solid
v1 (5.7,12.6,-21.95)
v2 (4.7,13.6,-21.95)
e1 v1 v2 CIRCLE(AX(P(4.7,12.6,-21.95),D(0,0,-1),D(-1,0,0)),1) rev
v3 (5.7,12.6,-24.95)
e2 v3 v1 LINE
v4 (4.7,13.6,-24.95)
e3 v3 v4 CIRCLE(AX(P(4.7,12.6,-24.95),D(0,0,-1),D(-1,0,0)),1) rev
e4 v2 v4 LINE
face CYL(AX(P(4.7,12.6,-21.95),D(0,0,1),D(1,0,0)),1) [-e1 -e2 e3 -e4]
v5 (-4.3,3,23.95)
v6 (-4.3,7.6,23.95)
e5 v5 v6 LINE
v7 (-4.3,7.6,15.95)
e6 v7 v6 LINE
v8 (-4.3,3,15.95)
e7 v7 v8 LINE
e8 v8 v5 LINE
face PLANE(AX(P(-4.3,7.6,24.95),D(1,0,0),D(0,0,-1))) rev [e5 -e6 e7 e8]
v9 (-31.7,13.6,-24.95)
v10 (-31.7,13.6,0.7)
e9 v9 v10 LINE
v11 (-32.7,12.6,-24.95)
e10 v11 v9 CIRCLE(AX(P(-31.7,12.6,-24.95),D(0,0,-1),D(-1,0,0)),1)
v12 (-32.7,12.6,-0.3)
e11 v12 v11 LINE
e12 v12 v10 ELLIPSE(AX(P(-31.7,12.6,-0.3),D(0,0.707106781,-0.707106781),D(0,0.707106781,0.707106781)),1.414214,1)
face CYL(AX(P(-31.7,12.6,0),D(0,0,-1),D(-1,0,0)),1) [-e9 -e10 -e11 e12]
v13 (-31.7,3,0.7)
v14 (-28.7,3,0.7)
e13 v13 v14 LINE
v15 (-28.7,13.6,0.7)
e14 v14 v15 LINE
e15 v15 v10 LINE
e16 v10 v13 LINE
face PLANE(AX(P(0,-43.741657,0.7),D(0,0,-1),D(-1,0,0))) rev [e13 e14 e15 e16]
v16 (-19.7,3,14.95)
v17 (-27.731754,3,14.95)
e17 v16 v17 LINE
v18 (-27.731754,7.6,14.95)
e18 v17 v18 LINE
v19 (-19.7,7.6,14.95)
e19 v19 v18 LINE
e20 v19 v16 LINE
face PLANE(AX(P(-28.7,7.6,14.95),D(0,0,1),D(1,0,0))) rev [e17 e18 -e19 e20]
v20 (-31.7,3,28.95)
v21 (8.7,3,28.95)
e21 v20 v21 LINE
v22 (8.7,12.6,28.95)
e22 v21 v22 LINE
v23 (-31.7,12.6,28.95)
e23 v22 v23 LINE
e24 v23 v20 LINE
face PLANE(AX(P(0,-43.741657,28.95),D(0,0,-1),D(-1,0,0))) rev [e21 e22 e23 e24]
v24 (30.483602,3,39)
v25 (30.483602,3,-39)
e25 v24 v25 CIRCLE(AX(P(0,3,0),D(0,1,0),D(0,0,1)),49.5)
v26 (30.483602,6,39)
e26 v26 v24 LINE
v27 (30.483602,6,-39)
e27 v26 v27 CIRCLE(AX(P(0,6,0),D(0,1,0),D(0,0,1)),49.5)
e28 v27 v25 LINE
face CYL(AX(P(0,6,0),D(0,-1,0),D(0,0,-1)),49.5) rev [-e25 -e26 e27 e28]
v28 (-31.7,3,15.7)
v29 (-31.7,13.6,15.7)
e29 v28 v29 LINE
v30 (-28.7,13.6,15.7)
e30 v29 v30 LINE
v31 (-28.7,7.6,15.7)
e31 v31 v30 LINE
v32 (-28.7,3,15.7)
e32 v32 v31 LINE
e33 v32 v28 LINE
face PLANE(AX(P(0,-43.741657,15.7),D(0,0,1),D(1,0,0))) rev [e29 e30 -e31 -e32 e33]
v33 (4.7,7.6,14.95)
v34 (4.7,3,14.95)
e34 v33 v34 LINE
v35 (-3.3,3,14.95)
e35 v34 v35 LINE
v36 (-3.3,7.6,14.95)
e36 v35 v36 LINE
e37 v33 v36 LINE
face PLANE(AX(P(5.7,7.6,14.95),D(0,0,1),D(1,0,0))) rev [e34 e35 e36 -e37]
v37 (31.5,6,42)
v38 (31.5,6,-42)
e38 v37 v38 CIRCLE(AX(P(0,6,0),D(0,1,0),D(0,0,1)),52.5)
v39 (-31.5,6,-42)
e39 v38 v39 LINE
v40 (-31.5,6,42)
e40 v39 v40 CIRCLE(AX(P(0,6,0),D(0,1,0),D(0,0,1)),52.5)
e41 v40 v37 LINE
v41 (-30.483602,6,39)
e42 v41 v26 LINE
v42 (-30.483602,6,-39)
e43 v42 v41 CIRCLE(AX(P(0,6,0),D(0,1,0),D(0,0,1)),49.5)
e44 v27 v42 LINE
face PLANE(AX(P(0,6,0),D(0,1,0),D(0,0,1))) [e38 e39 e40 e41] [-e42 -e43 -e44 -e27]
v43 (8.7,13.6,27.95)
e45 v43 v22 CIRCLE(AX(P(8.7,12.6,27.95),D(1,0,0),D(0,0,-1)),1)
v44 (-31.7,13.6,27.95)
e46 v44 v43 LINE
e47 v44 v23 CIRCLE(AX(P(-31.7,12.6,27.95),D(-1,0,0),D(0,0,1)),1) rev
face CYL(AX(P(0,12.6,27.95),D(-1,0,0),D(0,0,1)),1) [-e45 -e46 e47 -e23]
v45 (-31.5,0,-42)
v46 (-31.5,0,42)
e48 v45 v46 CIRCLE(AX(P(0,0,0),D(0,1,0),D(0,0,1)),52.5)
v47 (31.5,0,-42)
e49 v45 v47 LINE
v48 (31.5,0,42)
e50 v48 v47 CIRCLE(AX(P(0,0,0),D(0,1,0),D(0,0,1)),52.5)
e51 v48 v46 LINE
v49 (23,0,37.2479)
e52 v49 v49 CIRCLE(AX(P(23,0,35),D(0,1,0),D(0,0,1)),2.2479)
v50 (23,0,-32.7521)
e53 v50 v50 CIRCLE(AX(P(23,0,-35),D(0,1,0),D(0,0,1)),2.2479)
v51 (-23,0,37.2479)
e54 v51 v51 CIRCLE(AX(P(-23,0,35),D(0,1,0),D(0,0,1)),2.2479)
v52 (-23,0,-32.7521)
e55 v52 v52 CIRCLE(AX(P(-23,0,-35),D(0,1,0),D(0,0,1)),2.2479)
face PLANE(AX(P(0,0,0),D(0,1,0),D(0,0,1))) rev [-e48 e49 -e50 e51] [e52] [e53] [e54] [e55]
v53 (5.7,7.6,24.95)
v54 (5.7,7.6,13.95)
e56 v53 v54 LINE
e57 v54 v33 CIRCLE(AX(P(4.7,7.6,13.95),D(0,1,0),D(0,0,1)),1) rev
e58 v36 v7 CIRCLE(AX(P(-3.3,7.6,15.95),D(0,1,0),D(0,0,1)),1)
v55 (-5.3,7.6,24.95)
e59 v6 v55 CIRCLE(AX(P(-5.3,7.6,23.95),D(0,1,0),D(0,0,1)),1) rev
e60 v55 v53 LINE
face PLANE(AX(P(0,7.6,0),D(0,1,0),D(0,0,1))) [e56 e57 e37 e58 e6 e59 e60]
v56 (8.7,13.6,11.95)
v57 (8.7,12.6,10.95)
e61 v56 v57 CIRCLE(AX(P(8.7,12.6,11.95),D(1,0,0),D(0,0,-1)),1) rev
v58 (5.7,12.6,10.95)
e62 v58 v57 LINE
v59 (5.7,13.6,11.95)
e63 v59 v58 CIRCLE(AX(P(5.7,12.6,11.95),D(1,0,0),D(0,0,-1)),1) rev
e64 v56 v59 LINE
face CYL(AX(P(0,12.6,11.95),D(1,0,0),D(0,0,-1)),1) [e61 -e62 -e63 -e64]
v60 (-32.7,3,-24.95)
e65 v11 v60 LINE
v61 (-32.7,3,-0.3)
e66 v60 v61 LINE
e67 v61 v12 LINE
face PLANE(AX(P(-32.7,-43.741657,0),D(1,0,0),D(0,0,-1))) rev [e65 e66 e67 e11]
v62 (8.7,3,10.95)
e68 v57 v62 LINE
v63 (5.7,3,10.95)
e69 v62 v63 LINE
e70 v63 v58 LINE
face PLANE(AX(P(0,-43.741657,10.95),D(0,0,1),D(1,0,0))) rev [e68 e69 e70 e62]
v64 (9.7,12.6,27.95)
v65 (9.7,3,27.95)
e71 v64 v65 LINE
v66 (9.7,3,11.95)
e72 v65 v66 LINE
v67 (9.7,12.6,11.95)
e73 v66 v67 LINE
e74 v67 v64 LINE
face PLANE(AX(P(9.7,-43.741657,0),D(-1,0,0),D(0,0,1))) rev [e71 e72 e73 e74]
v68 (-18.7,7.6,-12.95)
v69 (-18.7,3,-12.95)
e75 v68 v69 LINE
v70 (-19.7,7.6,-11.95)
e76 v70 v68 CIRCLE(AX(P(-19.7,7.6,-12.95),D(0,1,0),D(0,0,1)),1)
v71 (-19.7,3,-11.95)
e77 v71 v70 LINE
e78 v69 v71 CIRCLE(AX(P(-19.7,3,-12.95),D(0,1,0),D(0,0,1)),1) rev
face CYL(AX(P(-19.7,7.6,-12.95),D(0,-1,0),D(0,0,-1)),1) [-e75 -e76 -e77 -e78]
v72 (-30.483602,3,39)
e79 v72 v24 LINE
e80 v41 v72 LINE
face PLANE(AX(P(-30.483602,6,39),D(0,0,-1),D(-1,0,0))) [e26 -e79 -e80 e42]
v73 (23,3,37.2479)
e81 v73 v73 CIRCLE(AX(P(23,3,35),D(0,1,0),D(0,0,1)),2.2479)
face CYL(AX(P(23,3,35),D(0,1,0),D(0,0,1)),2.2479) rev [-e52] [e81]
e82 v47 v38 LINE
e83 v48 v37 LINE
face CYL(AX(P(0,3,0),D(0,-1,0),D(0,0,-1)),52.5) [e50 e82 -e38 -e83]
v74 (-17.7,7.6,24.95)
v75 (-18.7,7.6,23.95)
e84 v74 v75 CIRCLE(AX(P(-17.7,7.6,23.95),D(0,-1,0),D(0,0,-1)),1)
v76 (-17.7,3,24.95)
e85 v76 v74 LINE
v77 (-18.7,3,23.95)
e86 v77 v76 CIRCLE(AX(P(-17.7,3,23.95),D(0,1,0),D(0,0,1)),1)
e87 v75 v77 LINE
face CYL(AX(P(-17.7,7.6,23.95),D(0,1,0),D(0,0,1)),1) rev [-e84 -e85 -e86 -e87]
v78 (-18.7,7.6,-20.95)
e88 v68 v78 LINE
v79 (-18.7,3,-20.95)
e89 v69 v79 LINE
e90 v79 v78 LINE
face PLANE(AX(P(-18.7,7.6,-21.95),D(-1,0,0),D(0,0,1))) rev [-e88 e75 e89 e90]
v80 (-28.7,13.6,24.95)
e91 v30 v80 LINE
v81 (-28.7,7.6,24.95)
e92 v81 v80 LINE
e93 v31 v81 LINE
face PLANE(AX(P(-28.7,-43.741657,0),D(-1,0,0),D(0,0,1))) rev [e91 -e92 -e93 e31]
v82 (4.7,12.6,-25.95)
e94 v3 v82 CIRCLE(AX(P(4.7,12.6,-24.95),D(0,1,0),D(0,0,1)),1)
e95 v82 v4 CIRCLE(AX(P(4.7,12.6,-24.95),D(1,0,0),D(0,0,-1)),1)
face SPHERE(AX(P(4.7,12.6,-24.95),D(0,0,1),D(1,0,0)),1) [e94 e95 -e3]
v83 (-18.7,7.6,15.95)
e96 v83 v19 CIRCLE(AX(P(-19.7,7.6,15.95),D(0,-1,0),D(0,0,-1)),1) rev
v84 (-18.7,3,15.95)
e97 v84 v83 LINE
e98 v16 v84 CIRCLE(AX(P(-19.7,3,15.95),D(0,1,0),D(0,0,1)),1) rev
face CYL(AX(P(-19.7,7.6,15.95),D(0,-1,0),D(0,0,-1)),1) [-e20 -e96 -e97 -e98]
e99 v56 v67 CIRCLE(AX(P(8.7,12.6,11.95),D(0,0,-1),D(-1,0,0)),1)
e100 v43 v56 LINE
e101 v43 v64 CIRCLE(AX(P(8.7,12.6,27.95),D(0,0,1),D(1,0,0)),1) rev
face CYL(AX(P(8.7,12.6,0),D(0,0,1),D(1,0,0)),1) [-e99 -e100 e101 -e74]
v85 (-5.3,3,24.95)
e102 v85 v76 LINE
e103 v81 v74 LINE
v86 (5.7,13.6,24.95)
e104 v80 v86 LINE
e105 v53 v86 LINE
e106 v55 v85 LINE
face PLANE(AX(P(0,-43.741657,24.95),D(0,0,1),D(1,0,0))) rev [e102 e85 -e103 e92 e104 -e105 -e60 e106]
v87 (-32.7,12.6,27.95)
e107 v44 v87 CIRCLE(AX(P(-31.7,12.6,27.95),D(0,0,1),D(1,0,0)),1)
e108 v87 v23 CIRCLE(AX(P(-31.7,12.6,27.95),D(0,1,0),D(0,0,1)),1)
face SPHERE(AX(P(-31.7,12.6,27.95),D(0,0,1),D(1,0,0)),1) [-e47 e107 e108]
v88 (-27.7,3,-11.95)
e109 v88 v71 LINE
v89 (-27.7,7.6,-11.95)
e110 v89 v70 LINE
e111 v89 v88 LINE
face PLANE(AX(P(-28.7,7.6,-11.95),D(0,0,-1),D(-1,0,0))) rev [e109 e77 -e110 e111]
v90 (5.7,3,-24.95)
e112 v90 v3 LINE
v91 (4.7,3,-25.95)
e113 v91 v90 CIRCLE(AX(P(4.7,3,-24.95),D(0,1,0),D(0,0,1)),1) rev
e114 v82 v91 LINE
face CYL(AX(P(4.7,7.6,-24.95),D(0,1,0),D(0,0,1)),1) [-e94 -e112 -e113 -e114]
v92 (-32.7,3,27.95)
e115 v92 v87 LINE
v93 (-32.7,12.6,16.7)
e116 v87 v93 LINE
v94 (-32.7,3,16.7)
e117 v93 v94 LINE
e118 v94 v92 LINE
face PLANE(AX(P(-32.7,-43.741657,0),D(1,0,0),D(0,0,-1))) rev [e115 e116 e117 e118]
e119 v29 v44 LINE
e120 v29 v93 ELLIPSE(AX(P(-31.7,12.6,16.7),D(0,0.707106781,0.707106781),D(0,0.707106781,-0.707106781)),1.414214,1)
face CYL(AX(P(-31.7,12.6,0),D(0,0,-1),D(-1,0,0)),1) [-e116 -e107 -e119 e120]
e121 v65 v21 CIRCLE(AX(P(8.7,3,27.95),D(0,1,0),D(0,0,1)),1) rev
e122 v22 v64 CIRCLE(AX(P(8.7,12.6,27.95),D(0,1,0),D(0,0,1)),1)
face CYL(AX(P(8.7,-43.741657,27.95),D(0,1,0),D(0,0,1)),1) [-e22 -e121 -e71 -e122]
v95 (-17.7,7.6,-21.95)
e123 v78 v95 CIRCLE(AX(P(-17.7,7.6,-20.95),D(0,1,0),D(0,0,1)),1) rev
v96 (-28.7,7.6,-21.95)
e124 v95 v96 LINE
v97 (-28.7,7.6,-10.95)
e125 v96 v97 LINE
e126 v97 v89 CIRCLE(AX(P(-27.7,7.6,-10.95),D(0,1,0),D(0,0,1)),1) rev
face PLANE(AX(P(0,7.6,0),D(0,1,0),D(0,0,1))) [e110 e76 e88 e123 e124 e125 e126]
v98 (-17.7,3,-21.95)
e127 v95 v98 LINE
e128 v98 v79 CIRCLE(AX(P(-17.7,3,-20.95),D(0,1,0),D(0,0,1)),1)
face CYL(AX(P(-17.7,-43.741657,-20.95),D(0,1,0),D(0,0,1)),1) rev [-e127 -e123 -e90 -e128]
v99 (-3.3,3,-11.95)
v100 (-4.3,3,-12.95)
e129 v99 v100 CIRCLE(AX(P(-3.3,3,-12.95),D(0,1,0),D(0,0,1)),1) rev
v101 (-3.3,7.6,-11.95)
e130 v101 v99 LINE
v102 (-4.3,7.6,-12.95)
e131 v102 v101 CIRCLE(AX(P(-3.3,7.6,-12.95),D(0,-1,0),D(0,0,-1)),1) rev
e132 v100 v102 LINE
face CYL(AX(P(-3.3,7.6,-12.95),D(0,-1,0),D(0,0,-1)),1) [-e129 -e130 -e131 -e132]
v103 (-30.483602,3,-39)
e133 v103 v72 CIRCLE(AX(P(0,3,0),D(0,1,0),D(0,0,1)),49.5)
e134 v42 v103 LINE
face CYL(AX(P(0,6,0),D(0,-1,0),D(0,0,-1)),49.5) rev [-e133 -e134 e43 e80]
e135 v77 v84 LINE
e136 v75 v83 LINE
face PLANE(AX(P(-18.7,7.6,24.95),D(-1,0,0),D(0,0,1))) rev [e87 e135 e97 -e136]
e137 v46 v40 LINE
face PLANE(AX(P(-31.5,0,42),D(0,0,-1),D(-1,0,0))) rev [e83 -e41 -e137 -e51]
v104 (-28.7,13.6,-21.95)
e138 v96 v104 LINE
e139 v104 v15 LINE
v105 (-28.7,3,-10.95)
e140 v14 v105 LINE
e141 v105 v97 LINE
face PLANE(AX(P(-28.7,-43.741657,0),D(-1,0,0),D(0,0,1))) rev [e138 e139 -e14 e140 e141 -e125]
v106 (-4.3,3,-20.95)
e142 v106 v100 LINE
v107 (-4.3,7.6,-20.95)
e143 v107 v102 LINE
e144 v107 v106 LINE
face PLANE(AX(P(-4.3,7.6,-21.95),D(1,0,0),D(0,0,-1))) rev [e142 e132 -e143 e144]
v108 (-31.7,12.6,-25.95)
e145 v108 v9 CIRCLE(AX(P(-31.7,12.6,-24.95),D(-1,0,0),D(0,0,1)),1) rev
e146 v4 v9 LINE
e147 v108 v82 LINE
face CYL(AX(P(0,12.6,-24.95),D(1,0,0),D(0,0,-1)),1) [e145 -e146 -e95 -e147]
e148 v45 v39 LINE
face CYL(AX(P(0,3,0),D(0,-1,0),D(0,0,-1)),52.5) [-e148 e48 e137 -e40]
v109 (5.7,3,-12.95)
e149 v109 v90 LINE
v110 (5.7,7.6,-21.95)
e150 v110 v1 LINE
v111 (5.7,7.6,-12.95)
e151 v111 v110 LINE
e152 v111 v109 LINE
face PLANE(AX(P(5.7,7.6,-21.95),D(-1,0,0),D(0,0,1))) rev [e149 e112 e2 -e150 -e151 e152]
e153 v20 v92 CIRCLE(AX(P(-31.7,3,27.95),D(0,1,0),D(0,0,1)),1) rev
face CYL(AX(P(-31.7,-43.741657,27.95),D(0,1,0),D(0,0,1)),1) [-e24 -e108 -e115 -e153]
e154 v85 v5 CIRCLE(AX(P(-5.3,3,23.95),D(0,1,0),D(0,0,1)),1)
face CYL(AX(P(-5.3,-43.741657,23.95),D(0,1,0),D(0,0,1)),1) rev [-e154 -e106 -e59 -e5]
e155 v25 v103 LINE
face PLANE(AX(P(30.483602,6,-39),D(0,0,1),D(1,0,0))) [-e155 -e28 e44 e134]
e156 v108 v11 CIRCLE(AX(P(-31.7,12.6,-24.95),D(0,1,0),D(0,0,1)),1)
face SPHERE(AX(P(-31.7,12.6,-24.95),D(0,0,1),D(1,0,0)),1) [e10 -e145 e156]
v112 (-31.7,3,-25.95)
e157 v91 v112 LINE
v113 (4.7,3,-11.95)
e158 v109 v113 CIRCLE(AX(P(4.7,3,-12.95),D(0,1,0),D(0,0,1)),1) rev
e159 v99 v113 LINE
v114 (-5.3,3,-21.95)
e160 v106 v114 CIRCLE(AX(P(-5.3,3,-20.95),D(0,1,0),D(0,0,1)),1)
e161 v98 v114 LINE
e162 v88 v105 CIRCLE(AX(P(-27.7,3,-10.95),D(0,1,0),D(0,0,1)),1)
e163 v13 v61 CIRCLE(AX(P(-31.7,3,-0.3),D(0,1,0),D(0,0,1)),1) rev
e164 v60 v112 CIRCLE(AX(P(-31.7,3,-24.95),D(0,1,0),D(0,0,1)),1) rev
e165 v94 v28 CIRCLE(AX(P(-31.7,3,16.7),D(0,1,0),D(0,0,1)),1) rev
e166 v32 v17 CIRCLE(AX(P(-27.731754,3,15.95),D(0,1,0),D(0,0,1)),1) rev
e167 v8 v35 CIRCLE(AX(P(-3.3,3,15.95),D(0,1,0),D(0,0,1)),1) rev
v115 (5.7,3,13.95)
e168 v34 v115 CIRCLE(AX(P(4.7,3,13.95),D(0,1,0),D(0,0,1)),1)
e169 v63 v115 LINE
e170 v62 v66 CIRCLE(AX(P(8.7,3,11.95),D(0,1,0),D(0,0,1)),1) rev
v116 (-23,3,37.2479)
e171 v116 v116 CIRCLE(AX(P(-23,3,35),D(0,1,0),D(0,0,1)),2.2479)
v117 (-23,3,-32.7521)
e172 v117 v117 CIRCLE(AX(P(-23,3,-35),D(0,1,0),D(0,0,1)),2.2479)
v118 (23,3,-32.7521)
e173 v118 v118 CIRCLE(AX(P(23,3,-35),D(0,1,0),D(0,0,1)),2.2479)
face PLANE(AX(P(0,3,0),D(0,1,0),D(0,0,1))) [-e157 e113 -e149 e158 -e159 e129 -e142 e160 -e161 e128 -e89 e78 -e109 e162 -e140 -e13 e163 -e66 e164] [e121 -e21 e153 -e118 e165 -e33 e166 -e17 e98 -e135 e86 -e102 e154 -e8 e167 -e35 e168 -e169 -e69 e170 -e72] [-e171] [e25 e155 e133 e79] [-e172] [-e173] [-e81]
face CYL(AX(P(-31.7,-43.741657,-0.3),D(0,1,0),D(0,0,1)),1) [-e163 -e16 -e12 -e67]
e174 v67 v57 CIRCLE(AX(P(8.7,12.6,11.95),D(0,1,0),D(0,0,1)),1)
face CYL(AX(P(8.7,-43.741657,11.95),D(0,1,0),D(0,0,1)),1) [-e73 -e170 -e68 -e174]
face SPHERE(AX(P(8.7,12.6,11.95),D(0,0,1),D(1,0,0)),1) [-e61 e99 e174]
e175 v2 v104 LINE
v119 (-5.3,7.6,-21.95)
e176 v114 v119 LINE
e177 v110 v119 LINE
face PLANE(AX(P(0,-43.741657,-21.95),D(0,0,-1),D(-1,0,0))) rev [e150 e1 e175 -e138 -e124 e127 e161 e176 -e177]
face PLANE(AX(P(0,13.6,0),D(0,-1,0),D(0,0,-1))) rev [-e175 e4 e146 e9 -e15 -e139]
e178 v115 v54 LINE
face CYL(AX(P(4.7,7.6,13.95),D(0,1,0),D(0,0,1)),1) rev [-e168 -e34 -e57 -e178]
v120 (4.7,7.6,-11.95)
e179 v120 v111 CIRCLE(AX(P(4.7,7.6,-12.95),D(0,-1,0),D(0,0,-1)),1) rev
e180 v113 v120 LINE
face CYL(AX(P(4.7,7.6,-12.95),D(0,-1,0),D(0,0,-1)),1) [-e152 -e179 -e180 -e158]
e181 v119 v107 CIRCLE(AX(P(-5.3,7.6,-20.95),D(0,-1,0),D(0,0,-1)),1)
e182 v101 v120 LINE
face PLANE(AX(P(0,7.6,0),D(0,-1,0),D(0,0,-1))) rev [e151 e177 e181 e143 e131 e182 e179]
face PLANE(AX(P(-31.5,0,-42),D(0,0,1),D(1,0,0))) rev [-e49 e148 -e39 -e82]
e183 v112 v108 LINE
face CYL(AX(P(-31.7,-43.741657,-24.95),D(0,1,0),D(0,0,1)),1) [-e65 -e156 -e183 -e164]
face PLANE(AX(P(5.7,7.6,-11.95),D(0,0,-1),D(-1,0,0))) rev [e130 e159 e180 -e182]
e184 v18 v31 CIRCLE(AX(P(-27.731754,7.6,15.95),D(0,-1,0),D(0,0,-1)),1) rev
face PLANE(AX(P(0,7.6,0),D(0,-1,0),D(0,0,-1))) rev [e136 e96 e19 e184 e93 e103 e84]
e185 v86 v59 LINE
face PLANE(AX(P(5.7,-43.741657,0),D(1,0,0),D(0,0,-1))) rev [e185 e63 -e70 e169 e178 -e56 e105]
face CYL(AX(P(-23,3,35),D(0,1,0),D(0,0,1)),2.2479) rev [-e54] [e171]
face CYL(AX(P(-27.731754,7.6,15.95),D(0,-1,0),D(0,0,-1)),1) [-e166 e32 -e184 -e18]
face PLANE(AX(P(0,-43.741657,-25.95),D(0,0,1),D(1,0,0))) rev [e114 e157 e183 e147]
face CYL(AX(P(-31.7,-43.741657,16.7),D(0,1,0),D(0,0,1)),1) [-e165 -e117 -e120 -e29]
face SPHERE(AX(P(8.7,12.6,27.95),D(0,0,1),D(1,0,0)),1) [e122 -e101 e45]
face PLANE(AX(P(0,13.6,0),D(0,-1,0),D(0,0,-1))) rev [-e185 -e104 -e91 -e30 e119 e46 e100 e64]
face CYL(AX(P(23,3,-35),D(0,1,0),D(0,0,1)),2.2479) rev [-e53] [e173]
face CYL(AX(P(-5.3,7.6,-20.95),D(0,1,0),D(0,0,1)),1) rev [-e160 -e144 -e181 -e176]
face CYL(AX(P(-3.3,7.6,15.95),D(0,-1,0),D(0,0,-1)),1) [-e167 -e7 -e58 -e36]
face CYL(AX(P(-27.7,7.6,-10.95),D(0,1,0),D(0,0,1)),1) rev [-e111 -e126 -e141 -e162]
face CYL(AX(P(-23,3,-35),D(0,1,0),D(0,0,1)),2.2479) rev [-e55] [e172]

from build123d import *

# Parameters (mm, degrees)
A_BASE_T42_OUTLINE_R       = 2.2479
A_BASE_T42_OUTLINE_R_2     = 1
A_BASE_T42_DEPTH           = 3
OUTER_BRIM_DEPTH           = 3
SKETCH5_W                  = 3
SKETCH5_H                  = 15
SKETCH5_W_2                = 15
SKETCH5_H_2                = 3
BASE_SUPPORTS_DEPTH        = 3
BASE_SUPPORTS_CHAMFER_SIZE = 3
COVER_START                = -3
SKETCH6_R                  = 1
COVER_DEPTH                = 3
SKETCH9_W                  = 15
SKETCH9_H                  = 6
SKETCH9_W_2                = 6
SKETCH9_H_2                = 15
CUT_EXTRUDE1_DEPTH         = 10
SKETCH10_W                 = 10
SKETCH10_H                 = 10
BOSS_EXTRUDE1_DEPTH        = 4.6
BOSS_EXTRUDE2_DEPTH        = 10.6
FILLET1_R                  = 1


with BuildPart() as part:
    # a_base_t42: read off the stored shape, not the designer's step
    # a_base_t42 outline → a_base_t42 (new body)
    with BuildSketch(Plane(origin=(0, 0, 0), x_dir=(1, 0, 0), z_dir=(0, 1, 0))):
        with BuildLine():
            ThreePointArc((31.5, -42), (52.5, 0), (31.5, 42))
            Line((31.5, 42), (-31.5, 42))
            ThreePointArc((-31.5, 42), (-52.5, 0), (-31.5, -42))
            Line((-31.5, -42), (31.5, -42))
        make_face()
        with Locations((-23, -35)):
            Circle(A_BASE_T42_OUTLINE_R, mode=Mode.SUBTRACT)
        with Locations((23, -35)):
            Circle(A_BASE_T42_OUTLINE_R, mode=Mode.SUBTRACT)
        with Locations((-40.25, 0)):
            Circle(A_BASE_T42_OUTLINE_R_2, mode=Mode.SUBTRACT)
        with Locations((-23, 35)):
            Circle(A_BASE_T42_OUTLINE_R, mode=Mode.SUBTRACT)
        with Locations((40.25, 0)):
            Circle(A_BASE_T42_OUTLINE_R_2, mode=Mode.SUBTRACT)
        with Locations((23, 35)):
            Circle(A_BASE_T42_OUTLINE_R, mode=Mode.SUBTRACT)
    extrude(amount=A_BASE_T42_DEPTH)

    # Sketch1 → Outer Brim (add)
    with BuildSketch(Plane(origin=(0, 3, 0), x_dir=(1, 0, 0), z_dir=(0, 1, 0))):
        with BuildLine():
            Line((-31.5, -42), (31.5, -42))
            ThreePointArc((31.5, -42), (52.5, 0), (31.5, 42))
            Line((31.5, 42), (-31.5, 42))
            ThreePointArc((-31.5, 42), (-52.5, 0), (-31.5, -42))
        make_face()
        with BuildLine():
            Line((30.483602149, 39), (-30.483602149, 39))
            ThreePointArc((-30.483602149, 39), (-49.5, 0), (-30.483602149, -39))
            Line((-30.483602149, -39), (30.483602149, -39))
            ThreePointArc((30.483602149, -39), (49.5, 0), (30.483602149, 39))
        make_face(mode=Mode.SUBTRACT)
    extrude(amount=OUTER_BRIM_DEPTH)

    # Sketch5 → Base Supports (add)
    with BuildSketch(Plane(origin=(0, 3, 0), x_dir=(1, 0, 0), z_dir=(0, 1, 0))):
        with Locations((-34.325, -12.5)):
            Rectangle(SKETCH5_W, SKETCH5_H)
        with Locations((-34.325, 12.5)):
            Rectangle(SKETCH5_W, SKETCH5_H)
        with Locations((-25.325, -27)):
            Rectangle(SKETCH5_W_2, SKETCH5_H_2)
        with Locations((-25.325, 27)):
            Rectangle(SKETCH5_W_2, SKETCH5_H_2)
    extrude(amount=BASE_SUPPORTS_DEPTH)

    # Base Supports Chamfer
    base_supports_chamfer_edges = [part.edges().sort_by_distance(p)[0] for p in [
        (-25.325, 3, 28.5),
        (-25.325, 3, -28.5),
        (-35.825, 3, 12.5),
        (-35.825, 3, -12.5),
    ]]
    chamfer(base_supports_chamfer_edges, length=BASE_SUPPORTS_CHAMFER_SIZE - 0.0001)  # a hair under: the kernel refuses the full size

    # Sketch6 → Cover (add)
    with BuildSketch(Plane(origin=(0, 3, 0), x_dir=(1, 0, 0), z_dir=(0, 1, 0)).offset(COVER_START)):
        with Locations((-40.25, 0)):
            Circle(SKETCH6_R)
        with Locations((40.25, 0)):
            Circle(SKETCH6_R)
    extrude(amount=COVER_DEPTH)

    # Sketch9 → Cut-Extrude1 (cut)
    with BuildSketch(Plane(origin=(0, 3, 0), x_dir=(1, 0, 0), z_dir=(0, 1, 0))):
        with Locations((-25.325, 28.5)):
            Rectangle(SKETCH9_W, SKETCH9_H)
        with Locations((-35.825, 12.5)):
            Rectangle(SKETCH9_W_2, SKETCH9_H_2)
        with Locations((-35.825, -12.5)):
            Rectangle(SKETCH9_W_2, SKETCH9_H_2)
        with Locations((-25.325, -28.5)):
            Rectangle(SKETCH9_W, SKETCH9_H)
    extrude(amount=CUT_EXTRUDE1_DEPTH, mode=Mode.SUBTRACT)

    # Sketch10 → Boss-Extrude1 (add)
    with BuildSketch(Plane(origin=(0, 3, 0), x_dir=(1, 0, 0), z_dir=(0, 1, 0))):
        with Locations((-23.7, 16.95)):
            Rectangle(SKETCH10_W, SKETCH10_H)
        with Locations((0.7, 16.95)):
            Rectangle(SKETCH10_W, SKETCH10_H)
        with Locations((0.7, -19.95)):
            Rectangle(SKETCH10_W, SKETCH10_H)
        with Locations((-23.7, -19.95)):
            Rectangle(SKETCH10_W, SKETCH10_H)
    extrude(amount=BOSS_EXTRUDE1_DEPTH)

    # Sketch11 → Boss-Extrude2 (add)
    with BuildSketch(Plane(origin=(0, 3, 0), x_dir=(1, 0, 0), z_dir=(0, 1, 0))):
        Polygon((-28.7, 21.95), (-28.7, -0.7), (-32.7, -0.7), (-32.7, 25.95), (5.7, 25.95), (5.7, 21.95), align=None)
        Polygon((-28.7, -24.95), (-28.7, -15.7), (-32.7, -15.7), (-32.7, -28.95), (9.7, -28.95), (9.7, -10.95), (5.7, -10.95), (5.7, -24.95), align=None)
    extrude(amount=BOSS_EXTRUDE2_DEPTH)

    # Fillet1
    # the kernel refuses this fillet: 1 mm, written as the material it adds along each edge
    with BuildSketch(Plane(origin=(-18.7, 0.5, 24.95), x_dir=(1, 0, 0), z_dir=(0, 1, 0)), Plane(origin=(-4.3, 0.5, 24.95), x_dir=(0, 0, -1), z_dir=(0, 1, 0)), Plane(origin=(5.7, 0.5, 14.95), x_dir=(0, 0, -1), z_dir=(0, 1, 0)), Plane(origin=(-4.3, 0.5, -21.95), x_dir=(-1, 0, 0), z_dir=(0, 1, 0)), Plane(origin=(-18.7, 0.5, -21.95), x_dir=(0, 0, 1), z_dir=(0, 1, 0)), Plane(origin=(-28.7, 0.5, -11.95), x_dir=(0, 0, 1), z_dir=(0, 1, 0))) as fillet1_piece_1:
        with BuildLine():
            CenterArc((FILLET1_R, FILLET1_R), FILLET1_R, 180, 90)
            Line((0, FILLET1_R), (0, 0))
            Line((0, 0), (FILLET1_R, 0))
        make_face()
    extrude(amount=7.1)
    # the kernel refuses this fillet: 1 mm, written as the material it takes off along each edge
    with BuildSketch(Plane(origin=(-31.7, 12.6, 27.95), x_dir=(0, 1, 0), z_dir=(-1, 0, 0))) as fillet1_2_piece_1_section:
        Polygon((0, 0), (FILLET1_R * 1.02, 0), (FILLET1_R * 1.02, -FILLET1_R * 1.02), (0, -FILLET1_R * 1.02), align=None)
    fillet1_2_piece_1 = extrude(amount=FILLET1_R * 1.02, mode=Mode.PRIVATE)
    fillet1_2_piece_1 = fillet1_2_piece_1 - Plane(origin=(-31.7, 12.6, 27.95), x_dir=(0, -0.7071067811865475, -0.7071067811865475), z_dir=(-1, 0, 0)) * Sphere(FILLET1_R, mode=Mode.PRIVATE)
    add(fillet1_2_piece_1, mode=Mode.SUBTRACT)
    with BuildSketch(Plane(origin=(8.7, 12.6, 27.95), x_dir=(1, 0, 0), z_dir=(0, 1, 0))) as fillet1_2_piece_2_section:
        Polygon((0, 0), (FILLET1_R * 1.02, 0), (FILLET1_R * 1.02, -FILLET1_R * 1.02), (0, -FILLET1_R * 1.02), align=None)
    fillet1_2_piece_2 = extrude(amount=FILLET1_R * 1.02, mode=Mode.PRIVATE)
    fillet1_2_piece_2 = fillet1_2_piece_2 - Plane(origin=(8.7, 12.6, 27.95), x_dir=(-0.7071067811865475, 0, -0.7071067811865475), z_dir=(0, 1, 0)) * Sphere(FILLET1_R, mode=Mode.PRIVATE)
    add(fillet1_2_piece_2, mode=Mode.SUBTRACT)
    with BuildSketch(Plane(origin=(8.7, 12.6, 11.95), x_dir=(0, 1, 0), z_dir=(0, 0, -1))) as fillet1_2_piece_3_section:
        Polygon((0, 0), (FILLET1_R * 1.02, 0), (FILLET1_R * 1.02, FILLET1_R * 1.02), (0, FILLET1_R * 1.02), align=None)
    fillet1_2_piece_3 = extrude(amount=FILLET1_R * 1.02, mode=Mode.PRIVATE)
    fillet1_2_piece_3 = fillet1_2_piece_3 - Plane(origin=(8.7, 12.6, 11.95), x_dir=(-0.7071067811865475, -0.7071067811865475, 0), z_dir=(0, 0, -1)) * Sphere(FILLET1_R, mode=Mode.PRIVATE)
    add(fillet1_2_piece_3, mode=Mode.SUBTRACT)
    with BuildSketch(Plane(origin=(4.7, 12.6, -24.95), x_dir=(1, 0, 0), z_dir=(0, 0, -1))) as fillet1_2_piece_4_section:
        Polygon((0, 0), (FILLET1_R * 1.02, 0), (FILLET1_R * 1.02, -FILLET1_R * 1.02), (0, -FILLET1_R * 1.02), align=None)
    fillet1_2_piece_4 = extrude(amount=FILLET1_R * 1.02, mode=Mode.PRIVATE)
    fillet1_2_piece_4 = fillet1_2_piece_4 - Plane(origin=(4.7, 12.6, -24.95), x_dir=(-0.7071067811865475, -0.7071067811865475, 0), z_dir=(0, 0, -1)) * Sphere(FILLET1_R, mode=Mode.PRIVATE)
    add(fillet1_2_piece_4, mode=Mode.SUBTRACT)
    with BuildSketch(Plane(origin=(-31.7, 12.6, -24.95), x_dir=(0, 1, 0), z_dir=(0, 0, -1))) as fillet1_2_piece_5_section:
        Polygon((0, 0), (FILLET1_R * 1.02, 0), (FILLET1_R * 1.02, -FILLET1_R * 1.02), (0, -FILLET1_R * 1.02), align=None)
    fillet1_2_piece_5 = extrude(amount=FILLET1_R * 1.02, mode=Mode.PRIVATE)
    fillet1_2_piece_5 = fillet1_2_piece_5 - Plane(origin=(-31.7, 12.6, -24.95), x_dir=(0.7071067811865475, -0.7071067811865475, 0), z_dir=(0, 0, -1)) * Sphere(FILLET1_R, mode=Mode.PRIVATE)
    add(fillet1_2_piece_5, mode=Mode.SUBTRACT)
    with BuildSketch(Plane(origin=(-32.7, 13.6, 13.2), x_dir=(1, 0, 0), z_dir=(0, 0, 1))) as fillet1_2_piece_6:
        with BuildLine():
            CenterArc((FILLET1_R, -FILLET1_R), FILLET1_R, 90, 90)
            Line((0, -FILLET1_R), (0, 0))
            Line((0, 0), (FILLET1_R, 0))
        make_face()
    extrude(amount=14.75, mode=Mode.SUBTRACT)
    with BuildSketch(Plane(origin=(-31.7, 13.6, 28.95), x_dir=(0, 0, -1), z_dir=(1, 0, 0))) as fillet1_2_piece_7:
        with BuildLine():
            CenterArc((FILLET1_R, -FILLET1_R), FILLET1_R, 90, 90)
            Line((0, -FILLET1_R), (0, 0))
            Line((0, 0), (FILLET1_R, 0))
        make_face()
    extrude(amount=40.4, mode=Mode.SUBTRACT)
    with BuildSketch(Plane(origin=(9.7, 13.6, 27.95), x_dir=(-1, 0, 0), z_dir=(0, 0, -1))) as fillet1_2_piece_8:
        with BuildLine():
            CenterArc((FILLET1_R, -FILLET1_R), FILLET1_R, 90, 90)
            Line((0, -FILLET1_R), (0, 0))
            Line((0, 0), (FILLET1_R, 0))
        make_face()
    extrude(amount=16, mode=Mode.SUBTRACT)
    with BuildSketch(Plane(origin=(5.7, 13.6, -24.95), x_dir=(-1, 0, 0), z_dir=(0, 0, 1))) as fillet1_2_piece_9:
        with BuildLine():
            CenterArc((FILLET1_R, FILLET1_R), FILLET1_R, 180, 90)
            Line((0, FILLET1_R), (0, 0))
            Line((0, 0), (FILLET1_R, 0))
        make_face()
    extrude(amount=5.5, mode=Mode.SUBTRACT)
    with BuildSketch(Plane(origin=(-31.7, 13.6, -25.95), x_dir=(0, 0, 1), z_dir=(1, 0, 0))) as fillet1_2_piece_10:
        with BuildLine():
            CenterArc((FILLET1_R, FILLET1_R), FILLET1_R, 180, 90)
            Line((0, FILLET1_R), (0, 0))
            Line((0, 0), (FILLET1_R, 0))
        make_face()
    extrude(amount=36.4, mode=Mode.SUBTRACT)
    with BuildSketch(Plane(origin=(-32.7, 13.6, 3.2), x_dir=(1, 0, 0), z_dir=(0, 0, -1))) as fillet1_2_piece_11:
        with BuildLine():
            CenterArc((FILLET1_R, FILLET1_R), FILLET1_R, 180, 90)
            Line((0, FILLET1_R), (0, 0))
            Line((0, 0), (FILLET1_R, 0))
        make_face()
    extrude(amount=28.15, mode=Mode.SUBTRACT)
    with BuildSketch(Plane(origin=(-32.7, 3, 0.7), x_dir=(1, 0, 0), z_dir=(0, 1, 0)), Plane(origin=(-32.7, 3, 15.7), x_dir=(0, 0, 1), z_dir=(0, 1, 0))) as fillet1_2_piece_12:
        with BuildLine():
            CenterArc((FILLET1_R, FILLET1_R), FILLET1_R, 180, 90)
            Line((0, FILLET1_R), (0, 0))
            Line((0, 0), (FILLET1_R, 0))
        make_face()
    extrude(amount=13.1, mode=Mode.SUBTRACT)
    with BuildSketch(Plane(origin=(-32.7, 3, -25.95), x_dir=(0, 0, 1), z_dir=(0, 1, 0)), Plane(origin=(5.7, 3, -25.95), x_dir=(-1, 0, 0), z_dir=(0, 1, 0)), Plane(origin=(9.7, 3, 10.95), x_dir=(-1, 0, 0), z_dir=(0, 1, 0)), Plane(origin=(9.7, 3, 28.95), x_dir=(0, 0, -1), z_dir=(0, 1, 0)), Plane(origin=(-32.7, 3, 28.95), x_dir=(1, 0, 0), z_dir=(0, 1, 0))) as fillet1_2_piece_13:
        with BuildLine():
            CenterArc((FILLET1_R, FILLET1_R), FILLET1_R, 180, 90)
            Line((0, FILLET1_R), (0, 0))
            Line((0, 0), (FILLET1_R, 0))
        make_face()
    extrude(amount=9.6, mode=Mode.SUBTRACT)
    with BuildSketch(Plane(origin=(-28.7, 3, 14.95), x_dir=(0, 0, 1), z_dir=(0, 1, 0))) as fillet1_2_piece_14:
        with BuildLine():
            CenterArc((1, 0.968245837), FILLET1_R, 180, 75.522487814)
            Line((0, 0.968245837), (0, 0))
            Line((0, 0), (0.75, 0))
        make_face()
    extrude(amount=7.020614591, mode=Mode.SUBTRACT)
    with BuildSketch(Plane(origin=(-18.7, 3, 14.95), x_dir=(-1, 0, 0), z_dir=(0, 1, 0)), Plane(origin=(-4.3, 3, 14.95), x_dir=(0, 0, 1), z_dir=(0, 1, 0)), Plane(origin=(5.7, 3, -11.95), x_dir=(0, 0, -1), z_dir=(0, 1, 0)), Plane(origin=(-4.3, 3, -11.95), x_dir=(1, 0, 0), z_dir=(0, 1, 0))) as fillet1_2_piece_15:
        with BuildLine():
            CenterArc((FILLET1_R, FILLET1_R), FILLET1_R, 180, 90)
            Line((0, FILLET1_R), (0, 0))
            Line((0, 0), (FILLET1_R, 0))
        make_face()
    extrude(amount=7.1, mode=Mode.SUBTRACT)
    with BuildSketch(Plane(origin=(-18.7, 3, -11.95), x_dir=(-1, 0, 0), z_dir=(0, 1, 0))) as fillet1_2_piece_16:
        with BuildLine():
            CenterArc((FILLET1_R, -FILLET1_R), FILLET1_R, 90, 90)
            Line((0, -FILLET1_R), (0, 0))
            Line((0, 0), (FILLET1_R, 0))
        make_face()
    extrude(amount=7.1, mode=Mode.SUBTRACT)
    with BuildSketch(Plane(origin=(8.7, 13.6, 10.95), x_dir=(0, 0, 1), z_dir=(-1, 0, 0))) as fillet1_2_piece_17:
        with BuildLine():
            CenterArc((FILLET1_R, -FILLET1_R), FILLET1_R, 90, 90)
            Line((0, -FILLET1_R), (0, 0))
            Line((0, 0), (FILLET1_R, 0))
        make_face()
    extrude(amount=5.5, mode=Mode.SUBTRACT)


solid = part.part
